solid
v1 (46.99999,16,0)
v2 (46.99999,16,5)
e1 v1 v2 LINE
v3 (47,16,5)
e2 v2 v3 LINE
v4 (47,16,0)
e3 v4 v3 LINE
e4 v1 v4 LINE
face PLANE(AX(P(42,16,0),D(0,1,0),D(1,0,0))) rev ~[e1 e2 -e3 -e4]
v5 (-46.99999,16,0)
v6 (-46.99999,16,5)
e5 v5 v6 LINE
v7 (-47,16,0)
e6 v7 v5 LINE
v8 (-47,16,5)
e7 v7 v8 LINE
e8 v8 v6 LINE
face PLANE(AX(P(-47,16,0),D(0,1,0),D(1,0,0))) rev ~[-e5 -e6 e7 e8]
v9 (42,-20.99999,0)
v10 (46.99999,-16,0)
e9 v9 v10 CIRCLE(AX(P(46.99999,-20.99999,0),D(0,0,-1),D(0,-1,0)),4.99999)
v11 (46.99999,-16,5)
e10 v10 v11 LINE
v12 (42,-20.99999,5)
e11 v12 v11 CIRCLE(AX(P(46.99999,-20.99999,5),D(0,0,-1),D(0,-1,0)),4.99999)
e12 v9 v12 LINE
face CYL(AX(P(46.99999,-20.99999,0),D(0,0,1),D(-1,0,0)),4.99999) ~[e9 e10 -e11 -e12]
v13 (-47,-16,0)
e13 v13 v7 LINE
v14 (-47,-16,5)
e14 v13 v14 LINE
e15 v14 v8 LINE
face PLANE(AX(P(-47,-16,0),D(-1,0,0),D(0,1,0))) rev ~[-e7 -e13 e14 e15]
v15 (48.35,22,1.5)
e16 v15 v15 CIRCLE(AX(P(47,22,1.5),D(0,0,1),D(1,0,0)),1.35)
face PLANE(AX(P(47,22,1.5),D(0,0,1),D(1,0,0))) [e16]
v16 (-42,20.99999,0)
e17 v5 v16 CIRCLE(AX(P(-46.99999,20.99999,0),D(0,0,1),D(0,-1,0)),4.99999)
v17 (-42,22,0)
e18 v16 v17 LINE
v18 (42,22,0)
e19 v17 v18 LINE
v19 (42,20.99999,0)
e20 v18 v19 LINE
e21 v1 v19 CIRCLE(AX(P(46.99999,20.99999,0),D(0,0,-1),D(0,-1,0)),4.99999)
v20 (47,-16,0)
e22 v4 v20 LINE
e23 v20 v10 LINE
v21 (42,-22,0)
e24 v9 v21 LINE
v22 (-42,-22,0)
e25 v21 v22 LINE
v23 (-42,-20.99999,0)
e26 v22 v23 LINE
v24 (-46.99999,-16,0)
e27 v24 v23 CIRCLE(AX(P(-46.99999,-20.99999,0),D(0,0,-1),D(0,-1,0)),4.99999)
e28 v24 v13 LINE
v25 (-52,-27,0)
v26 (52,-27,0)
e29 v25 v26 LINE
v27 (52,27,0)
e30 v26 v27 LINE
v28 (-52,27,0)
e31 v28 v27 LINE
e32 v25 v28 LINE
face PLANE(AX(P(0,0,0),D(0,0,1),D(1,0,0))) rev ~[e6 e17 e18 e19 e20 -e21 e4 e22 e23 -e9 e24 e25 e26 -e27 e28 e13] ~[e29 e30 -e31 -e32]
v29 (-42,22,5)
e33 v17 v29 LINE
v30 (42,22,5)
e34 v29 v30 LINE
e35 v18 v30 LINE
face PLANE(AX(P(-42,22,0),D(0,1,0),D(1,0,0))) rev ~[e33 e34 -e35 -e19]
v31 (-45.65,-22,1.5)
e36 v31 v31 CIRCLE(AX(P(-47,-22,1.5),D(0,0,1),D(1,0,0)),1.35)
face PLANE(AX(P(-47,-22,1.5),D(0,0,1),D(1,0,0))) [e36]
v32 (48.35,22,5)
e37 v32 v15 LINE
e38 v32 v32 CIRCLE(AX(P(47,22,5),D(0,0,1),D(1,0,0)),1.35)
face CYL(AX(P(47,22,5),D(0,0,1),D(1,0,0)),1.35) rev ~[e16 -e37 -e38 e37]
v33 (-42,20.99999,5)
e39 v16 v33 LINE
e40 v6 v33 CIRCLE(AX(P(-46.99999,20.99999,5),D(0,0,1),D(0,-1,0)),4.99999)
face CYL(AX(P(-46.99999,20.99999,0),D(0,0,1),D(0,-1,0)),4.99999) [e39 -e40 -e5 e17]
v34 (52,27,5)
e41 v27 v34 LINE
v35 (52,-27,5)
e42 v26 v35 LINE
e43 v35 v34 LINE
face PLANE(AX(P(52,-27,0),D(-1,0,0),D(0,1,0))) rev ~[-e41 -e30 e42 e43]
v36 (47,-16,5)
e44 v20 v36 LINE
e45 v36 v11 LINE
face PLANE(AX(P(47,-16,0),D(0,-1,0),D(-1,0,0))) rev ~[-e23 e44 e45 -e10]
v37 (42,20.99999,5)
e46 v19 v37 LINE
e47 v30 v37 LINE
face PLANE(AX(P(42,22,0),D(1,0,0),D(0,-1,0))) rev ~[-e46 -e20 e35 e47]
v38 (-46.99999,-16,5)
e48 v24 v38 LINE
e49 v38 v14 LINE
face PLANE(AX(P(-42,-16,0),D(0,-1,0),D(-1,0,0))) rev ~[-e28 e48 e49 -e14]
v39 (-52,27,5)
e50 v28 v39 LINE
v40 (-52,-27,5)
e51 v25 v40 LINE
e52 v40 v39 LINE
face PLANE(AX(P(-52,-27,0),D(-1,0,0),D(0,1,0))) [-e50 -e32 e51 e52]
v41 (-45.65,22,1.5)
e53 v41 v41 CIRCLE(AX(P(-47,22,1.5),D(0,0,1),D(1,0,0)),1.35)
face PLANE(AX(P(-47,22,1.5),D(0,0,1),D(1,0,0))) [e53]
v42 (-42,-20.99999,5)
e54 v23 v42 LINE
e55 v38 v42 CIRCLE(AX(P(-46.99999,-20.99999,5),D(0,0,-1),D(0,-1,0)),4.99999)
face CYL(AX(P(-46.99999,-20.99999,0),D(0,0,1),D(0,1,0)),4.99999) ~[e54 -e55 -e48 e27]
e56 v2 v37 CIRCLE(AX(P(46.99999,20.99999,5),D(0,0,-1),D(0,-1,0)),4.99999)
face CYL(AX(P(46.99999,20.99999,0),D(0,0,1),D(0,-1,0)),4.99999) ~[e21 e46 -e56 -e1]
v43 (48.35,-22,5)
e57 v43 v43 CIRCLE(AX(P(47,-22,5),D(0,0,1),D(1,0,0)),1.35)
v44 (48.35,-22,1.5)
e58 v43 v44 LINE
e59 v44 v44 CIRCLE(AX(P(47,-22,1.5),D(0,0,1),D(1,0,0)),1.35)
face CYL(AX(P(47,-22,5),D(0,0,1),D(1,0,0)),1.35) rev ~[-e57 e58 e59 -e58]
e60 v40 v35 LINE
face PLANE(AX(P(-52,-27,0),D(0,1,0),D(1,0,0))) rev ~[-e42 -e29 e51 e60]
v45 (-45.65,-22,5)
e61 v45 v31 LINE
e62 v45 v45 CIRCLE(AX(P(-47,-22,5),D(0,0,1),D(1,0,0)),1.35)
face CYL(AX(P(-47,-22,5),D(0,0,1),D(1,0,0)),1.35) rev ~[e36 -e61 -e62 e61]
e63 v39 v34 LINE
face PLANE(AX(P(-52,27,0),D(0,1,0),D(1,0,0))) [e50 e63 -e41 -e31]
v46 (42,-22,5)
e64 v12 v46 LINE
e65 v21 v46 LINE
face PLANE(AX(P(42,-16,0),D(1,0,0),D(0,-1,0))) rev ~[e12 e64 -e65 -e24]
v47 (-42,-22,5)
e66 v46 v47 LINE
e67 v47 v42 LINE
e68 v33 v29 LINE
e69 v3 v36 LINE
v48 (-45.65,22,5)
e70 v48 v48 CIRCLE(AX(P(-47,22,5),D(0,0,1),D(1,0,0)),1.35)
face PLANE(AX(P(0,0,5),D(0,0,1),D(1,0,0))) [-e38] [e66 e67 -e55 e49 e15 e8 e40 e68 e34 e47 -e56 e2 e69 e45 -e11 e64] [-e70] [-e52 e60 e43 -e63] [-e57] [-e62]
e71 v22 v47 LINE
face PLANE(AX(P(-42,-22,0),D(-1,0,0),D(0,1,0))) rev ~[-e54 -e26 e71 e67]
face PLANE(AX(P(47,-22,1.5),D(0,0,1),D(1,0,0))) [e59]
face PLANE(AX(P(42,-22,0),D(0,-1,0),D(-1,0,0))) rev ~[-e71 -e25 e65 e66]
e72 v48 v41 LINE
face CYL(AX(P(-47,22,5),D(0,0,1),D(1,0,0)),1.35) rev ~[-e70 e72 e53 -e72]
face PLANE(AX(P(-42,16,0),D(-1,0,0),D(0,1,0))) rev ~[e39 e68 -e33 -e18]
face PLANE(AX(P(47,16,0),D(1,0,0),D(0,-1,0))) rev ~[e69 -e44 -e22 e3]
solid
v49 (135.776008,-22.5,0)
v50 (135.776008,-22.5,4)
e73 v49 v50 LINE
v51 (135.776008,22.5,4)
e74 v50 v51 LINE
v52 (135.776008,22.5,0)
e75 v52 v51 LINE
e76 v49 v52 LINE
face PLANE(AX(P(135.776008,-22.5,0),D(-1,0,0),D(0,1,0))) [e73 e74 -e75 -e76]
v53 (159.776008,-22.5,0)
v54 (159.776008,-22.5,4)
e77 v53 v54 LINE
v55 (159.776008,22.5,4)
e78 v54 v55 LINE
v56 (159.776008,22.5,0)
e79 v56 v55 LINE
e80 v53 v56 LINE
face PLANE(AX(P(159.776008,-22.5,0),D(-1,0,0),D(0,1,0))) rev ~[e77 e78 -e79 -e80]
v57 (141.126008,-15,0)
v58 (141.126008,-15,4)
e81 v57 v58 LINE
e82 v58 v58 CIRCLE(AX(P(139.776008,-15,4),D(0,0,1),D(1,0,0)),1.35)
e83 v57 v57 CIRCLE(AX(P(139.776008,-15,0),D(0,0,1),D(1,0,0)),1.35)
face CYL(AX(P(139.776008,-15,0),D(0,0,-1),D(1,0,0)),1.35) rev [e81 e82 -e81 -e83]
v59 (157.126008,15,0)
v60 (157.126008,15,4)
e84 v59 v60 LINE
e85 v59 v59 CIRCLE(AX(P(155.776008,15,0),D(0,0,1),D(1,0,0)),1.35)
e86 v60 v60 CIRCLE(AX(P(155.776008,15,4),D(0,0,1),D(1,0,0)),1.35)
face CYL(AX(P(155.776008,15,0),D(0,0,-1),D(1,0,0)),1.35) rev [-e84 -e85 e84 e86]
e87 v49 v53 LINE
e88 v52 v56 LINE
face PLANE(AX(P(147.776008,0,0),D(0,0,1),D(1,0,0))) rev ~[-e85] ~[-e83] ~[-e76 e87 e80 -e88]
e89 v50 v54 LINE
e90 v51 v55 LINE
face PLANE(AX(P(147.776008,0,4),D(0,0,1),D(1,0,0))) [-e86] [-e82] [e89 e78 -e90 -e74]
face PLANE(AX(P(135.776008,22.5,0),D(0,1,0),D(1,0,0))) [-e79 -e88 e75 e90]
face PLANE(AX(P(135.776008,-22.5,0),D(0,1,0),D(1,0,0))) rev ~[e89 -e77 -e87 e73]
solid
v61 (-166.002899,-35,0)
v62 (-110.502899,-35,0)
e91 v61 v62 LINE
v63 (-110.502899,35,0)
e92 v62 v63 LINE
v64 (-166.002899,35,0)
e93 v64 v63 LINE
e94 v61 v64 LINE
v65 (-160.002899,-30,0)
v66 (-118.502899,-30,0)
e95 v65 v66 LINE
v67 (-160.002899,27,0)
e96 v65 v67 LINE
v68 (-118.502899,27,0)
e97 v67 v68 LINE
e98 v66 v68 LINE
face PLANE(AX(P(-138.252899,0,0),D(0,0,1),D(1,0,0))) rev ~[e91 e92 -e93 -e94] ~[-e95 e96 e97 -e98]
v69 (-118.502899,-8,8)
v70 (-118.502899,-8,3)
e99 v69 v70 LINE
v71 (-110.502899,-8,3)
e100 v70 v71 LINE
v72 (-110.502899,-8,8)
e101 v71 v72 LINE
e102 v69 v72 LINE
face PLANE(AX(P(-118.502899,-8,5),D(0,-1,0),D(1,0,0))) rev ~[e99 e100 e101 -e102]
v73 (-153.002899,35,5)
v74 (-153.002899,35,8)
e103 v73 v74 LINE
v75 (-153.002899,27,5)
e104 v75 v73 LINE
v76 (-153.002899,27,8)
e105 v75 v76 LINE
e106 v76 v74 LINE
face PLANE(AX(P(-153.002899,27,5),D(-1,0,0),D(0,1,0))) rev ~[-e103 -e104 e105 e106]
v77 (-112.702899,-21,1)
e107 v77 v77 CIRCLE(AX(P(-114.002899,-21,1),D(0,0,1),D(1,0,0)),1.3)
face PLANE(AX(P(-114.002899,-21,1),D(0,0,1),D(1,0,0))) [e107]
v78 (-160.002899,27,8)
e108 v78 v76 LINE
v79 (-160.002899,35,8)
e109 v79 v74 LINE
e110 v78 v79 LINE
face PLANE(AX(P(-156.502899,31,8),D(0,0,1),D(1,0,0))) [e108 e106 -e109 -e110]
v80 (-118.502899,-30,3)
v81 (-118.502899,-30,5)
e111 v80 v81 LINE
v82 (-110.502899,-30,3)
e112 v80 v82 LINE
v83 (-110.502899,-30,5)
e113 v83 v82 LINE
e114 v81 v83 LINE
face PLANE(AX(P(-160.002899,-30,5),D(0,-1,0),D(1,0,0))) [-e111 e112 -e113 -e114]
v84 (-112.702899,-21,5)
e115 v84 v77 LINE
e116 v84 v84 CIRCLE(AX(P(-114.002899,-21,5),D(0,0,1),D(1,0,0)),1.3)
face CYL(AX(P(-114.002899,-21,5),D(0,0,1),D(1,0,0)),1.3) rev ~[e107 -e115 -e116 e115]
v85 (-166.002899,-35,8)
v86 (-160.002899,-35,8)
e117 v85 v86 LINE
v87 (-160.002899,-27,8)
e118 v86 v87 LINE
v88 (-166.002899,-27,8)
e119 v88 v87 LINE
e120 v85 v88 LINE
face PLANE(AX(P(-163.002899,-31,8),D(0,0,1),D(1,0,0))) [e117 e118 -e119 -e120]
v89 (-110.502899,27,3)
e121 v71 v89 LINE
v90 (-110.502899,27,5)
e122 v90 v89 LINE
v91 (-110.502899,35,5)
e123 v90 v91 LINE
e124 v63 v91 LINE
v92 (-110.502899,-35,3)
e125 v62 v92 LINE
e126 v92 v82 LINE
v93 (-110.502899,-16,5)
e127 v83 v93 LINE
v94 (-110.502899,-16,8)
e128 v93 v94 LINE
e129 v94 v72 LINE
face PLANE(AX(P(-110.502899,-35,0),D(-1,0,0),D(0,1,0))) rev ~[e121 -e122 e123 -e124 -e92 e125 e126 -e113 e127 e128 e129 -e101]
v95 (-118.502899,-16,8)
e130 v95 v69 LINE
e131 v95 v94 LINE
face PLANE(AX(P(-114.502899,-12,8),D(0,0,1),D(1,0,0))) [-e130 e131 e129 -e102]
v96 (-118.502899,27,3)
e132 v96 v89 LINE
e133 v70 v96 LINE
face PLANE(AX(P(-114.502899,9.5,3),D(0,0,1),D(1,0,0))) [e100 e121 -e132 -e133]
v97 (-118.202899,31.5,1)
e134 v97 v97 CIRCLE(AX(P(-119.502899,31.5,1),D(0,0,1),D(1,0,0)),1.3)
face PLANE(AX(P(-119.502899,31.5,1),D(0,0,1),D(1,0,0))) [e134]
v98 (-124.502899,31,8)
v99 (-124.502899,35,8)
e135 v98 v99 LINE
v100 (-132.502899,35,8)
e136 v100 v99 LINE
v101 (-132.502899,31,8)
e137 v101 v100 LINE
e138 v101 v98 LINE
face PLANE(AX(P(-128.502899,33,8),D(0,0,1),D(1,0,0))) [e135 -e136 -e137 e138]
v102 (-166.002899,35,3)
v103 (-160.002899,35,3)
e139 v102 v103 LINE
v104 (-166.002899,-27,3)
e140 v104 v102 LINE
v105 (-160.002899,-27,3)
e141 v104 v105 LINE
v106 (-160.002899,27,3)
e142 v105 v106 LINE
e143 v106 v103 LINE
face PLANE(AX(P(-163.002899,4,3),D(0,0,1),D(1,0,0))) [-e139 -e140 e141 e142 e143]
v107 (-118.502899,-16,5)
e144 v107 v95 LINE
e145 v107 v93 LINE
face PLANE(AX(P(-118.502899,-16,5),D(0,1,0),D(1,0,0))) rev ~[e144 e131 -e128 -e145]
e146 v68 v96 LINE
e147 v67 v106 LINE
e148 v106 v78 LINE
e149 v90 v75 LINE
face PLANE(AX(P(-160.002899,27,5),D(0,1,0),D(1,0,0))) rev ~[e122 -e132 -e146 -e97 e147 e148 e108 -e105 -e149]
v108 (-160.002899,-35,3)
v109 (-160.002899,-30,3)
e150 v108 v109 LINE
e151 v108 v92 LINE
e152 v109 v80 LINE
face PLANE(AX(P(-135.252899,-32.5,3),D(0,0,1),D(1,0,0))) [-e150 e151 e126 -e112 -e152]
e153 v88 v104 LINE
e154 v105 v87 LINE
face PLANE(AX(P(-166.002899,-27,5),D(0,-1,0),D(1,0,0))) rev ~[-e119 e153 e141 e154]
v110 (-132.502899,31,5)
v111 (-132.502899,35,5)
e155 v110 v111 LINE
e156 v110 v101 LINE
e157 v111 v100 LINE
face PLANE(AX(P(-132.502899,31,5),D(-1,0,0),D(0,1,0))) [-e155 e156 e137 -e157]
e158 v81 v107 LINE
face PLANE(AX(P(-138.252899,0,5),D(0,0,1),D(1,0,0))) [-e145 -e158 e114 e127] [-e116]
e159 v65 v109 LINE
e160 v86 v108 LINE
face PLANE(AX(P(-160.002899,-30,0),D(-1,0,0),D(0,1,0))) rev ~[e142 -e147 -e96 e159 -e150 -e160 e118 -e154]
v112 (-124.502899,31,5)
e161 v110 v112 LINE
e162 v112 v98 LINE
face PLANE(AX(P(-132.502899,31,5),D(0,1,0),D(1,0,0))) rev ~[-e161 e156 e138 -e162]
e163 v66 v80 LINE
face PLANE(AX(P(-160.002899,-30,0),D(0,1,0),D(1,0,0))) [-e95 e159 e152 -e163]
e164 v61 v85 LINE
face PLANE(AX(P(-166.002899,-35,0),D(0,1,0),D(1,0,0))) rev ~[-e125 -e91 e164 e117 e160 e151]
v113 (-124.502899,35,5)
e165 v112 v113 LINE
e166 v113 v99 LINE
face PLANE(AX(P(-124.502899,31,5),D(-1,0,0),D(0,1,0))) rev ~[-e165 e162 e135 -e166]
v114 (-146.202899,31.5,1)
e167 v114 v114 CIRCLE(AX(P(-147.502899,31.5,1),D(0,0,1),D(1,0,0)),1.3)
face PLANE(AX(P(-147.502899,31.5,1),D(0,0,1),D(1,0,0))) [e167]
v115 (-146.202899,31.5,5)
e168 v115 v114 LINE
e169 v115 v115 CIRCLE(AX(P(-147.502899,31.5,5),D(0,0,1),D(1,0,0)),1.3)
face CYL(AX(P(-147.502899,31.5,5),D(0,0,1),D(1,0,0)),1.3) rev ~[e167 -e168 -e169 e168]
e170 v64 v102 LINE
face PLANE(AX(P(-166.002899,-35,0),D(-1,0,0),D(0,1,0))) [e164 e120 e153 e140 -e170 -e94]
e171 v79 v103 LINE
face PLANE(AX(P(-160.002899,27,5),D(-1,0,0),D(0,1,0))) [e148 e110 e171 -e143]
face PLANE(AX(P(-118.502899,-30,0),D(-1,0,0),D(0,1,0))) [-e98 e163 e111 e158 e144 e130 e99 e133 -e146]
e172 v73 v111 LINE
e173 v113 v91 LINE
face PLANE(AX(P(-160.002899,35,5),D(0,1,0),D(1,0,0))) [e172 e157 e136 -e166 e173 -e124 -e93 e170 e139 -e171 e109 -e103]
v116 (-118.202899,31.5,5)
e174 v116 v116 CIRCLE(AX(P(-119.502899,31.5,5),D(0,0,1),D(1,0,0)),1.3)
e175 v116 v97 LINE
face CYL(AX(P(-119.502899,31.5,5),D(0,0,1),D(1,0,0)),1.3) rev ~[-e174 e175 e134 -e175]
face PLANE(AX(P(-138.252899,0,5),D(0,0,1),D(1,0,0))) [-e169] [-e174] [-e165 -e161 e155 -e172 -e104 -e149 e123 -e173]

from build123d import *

# Parameters (mm, degrees)
F0_W      = 104
F0_H      = 54
F1_DEPTH  = 5
F2_R      = 1.35
F3_DEPTH  = 3.5
F4_R      = 4.99999
F5_W      = 24
F5_H      = 45
F5_R      = 1.35
F6_DEPTH  = 4
F7_W      = 55.5
F7_H      = 70
F7_W_2    = 41.5
F7_H_2    = 57
F8_DEPTH  = 5
F9_W      = 7
F9_H      = 8
F9_W_2    = 8
F9_H_2    = 4
F9_W_3    = 6
F10_DEPTH = 3
F12_W     = 6
F12_H     = 62
F12_W_2   = 49.5
F12_H_2   = 5
F12_W_3   = 8
F12_H_3   = 35
F13_DEPTH = 2
F14_R     = 1.3
F15_DEPTH = 4


# Not quite as in the source:
# - a fillet or chamfer is up to 0.001 mm smaller than in the source, because OpenCascade refuses the exact size


with BuildPart() as f1:
    # F0 (on Top) → F1 (new body)
    with BuildSketch(Plane.XY):
        Rectangle(F0_W, F0_H)
        Polygon((-42, 16), (-42, 22), (42, 22), (42, 16), (47, 16), (47, -16), (42, -16), (42, -22), (-42, -22), (-42, -16), (-47, -16), (-47, 16), align=None, mode=Mode.SUBTRACT)
    extrude(amount=F1_DEPTH)

    # F2 (on face) → F3 (cut)
    with BuildSketch(Plane.XY.offset(5)):
        with Locations((-47, 22)):
            Circle(F2_R)
        with Locations((47, 22)):
            Circle(F2_R)
        with Locations((-47, -22)):
            Circle(F2_R)
        with Locations((47, -22)):
            Circle(F2_R)
    extrude(amount=-F3_DEPTH, mode=Mode.SUBTRACT)

    # F4 (radius 5 in the source; OpenCascade refuses exactly that, so slightly less here)
    f4_edges = [f1.edges().sort_by_distance(p)[0] for p in [
        (-42, 16, 2.5),
        (-42, -16, 2.5),
        (42, 16, 2.5),
        (42, -16, 2.5),
    ]]
    fillet(f4_edges, radius=F4_R)


with BuildPart() as f6:
    # F5 (on Top) → F6 (new body)
    with BuildSketch(Plane.XY):
        with Locations((147.7760076523, 0)):
            Rectangle(F5_W, F5_H)
        with Locations((139.7760076523, -15)):
            Circle(F5_R, mode=Mode.SUBTRACT)
        with Locations((155.7760076523, 15)):
            Circle(F5_R, mode=Mode.SUBTRACT)
    extrude(amount=F6_DEPTH)


with BuildPart() as f8:
    # F7 (on Top) → F8 (new body)
    with BuildSketch(Plane.XY):
        with Locations((-138.2528990507, 0)):
            Rectangle(F7_W, F7_H)
        with Locations((-139.2528990507, -1.5)):
            Rectangle(F7_W_2, F7_H_2, mode=Mode.SUBTRACT)
    extrude(amount=F8_DEPTH)

    # F9 (on face) → F10 (join)
    with BuildSketch(Plane.XY.offset(5)):
        with Locations((-156.5028990507, 31)):
            Rectangle(F9_W, F9_H)
        with Locations((-128.5028990507, 33)):
            Rectangle(F9_W_2, F9_H_2)
        with Locations((-114.5028990507, -12)):
            Rectangle(F9_W_2, F9_H)
        with Locations((-163.0028990507, -31)):
            Rectangle(F9_W_3, F9_H)
    extrude(amount=F10_DEPTH)

    # F12 (on offset) → F13 (cut)
    with BuildSketch(Plane.XY.offset(5)):
        with Locations((-163.0028990507, 4)):
            Rectangle(F12_W, F12_H)
        with Locations((-135.2528990507, -32.5)):
            Rectangle(F12_W_2, F12_H_2)
        with Locations((-114.5028990507, 9.5)):
            Rectangle(F12_W_3, F12_H_3)
    extrude(amount=-F13_DEPTH, mode=Mode.SUBTRACT)

    # F14 (on face) → F15 (cut)
    with BuildSketch(Plane.XY.offset(5)):
        with Locations((-147.5028990507, 31.5)):
            Circle(F14_R)
        with Locations((-119.5028990507, 31.5)):
            Circle(F14_R)
        with Locations((-114.0028990507, -21)):
            Circle(F14_R)
    extrude(amount=-F15_DEPTH, mode=Mode.SUBTRACT)


solid = Compound([f1.part, f6.part, f8.part])
